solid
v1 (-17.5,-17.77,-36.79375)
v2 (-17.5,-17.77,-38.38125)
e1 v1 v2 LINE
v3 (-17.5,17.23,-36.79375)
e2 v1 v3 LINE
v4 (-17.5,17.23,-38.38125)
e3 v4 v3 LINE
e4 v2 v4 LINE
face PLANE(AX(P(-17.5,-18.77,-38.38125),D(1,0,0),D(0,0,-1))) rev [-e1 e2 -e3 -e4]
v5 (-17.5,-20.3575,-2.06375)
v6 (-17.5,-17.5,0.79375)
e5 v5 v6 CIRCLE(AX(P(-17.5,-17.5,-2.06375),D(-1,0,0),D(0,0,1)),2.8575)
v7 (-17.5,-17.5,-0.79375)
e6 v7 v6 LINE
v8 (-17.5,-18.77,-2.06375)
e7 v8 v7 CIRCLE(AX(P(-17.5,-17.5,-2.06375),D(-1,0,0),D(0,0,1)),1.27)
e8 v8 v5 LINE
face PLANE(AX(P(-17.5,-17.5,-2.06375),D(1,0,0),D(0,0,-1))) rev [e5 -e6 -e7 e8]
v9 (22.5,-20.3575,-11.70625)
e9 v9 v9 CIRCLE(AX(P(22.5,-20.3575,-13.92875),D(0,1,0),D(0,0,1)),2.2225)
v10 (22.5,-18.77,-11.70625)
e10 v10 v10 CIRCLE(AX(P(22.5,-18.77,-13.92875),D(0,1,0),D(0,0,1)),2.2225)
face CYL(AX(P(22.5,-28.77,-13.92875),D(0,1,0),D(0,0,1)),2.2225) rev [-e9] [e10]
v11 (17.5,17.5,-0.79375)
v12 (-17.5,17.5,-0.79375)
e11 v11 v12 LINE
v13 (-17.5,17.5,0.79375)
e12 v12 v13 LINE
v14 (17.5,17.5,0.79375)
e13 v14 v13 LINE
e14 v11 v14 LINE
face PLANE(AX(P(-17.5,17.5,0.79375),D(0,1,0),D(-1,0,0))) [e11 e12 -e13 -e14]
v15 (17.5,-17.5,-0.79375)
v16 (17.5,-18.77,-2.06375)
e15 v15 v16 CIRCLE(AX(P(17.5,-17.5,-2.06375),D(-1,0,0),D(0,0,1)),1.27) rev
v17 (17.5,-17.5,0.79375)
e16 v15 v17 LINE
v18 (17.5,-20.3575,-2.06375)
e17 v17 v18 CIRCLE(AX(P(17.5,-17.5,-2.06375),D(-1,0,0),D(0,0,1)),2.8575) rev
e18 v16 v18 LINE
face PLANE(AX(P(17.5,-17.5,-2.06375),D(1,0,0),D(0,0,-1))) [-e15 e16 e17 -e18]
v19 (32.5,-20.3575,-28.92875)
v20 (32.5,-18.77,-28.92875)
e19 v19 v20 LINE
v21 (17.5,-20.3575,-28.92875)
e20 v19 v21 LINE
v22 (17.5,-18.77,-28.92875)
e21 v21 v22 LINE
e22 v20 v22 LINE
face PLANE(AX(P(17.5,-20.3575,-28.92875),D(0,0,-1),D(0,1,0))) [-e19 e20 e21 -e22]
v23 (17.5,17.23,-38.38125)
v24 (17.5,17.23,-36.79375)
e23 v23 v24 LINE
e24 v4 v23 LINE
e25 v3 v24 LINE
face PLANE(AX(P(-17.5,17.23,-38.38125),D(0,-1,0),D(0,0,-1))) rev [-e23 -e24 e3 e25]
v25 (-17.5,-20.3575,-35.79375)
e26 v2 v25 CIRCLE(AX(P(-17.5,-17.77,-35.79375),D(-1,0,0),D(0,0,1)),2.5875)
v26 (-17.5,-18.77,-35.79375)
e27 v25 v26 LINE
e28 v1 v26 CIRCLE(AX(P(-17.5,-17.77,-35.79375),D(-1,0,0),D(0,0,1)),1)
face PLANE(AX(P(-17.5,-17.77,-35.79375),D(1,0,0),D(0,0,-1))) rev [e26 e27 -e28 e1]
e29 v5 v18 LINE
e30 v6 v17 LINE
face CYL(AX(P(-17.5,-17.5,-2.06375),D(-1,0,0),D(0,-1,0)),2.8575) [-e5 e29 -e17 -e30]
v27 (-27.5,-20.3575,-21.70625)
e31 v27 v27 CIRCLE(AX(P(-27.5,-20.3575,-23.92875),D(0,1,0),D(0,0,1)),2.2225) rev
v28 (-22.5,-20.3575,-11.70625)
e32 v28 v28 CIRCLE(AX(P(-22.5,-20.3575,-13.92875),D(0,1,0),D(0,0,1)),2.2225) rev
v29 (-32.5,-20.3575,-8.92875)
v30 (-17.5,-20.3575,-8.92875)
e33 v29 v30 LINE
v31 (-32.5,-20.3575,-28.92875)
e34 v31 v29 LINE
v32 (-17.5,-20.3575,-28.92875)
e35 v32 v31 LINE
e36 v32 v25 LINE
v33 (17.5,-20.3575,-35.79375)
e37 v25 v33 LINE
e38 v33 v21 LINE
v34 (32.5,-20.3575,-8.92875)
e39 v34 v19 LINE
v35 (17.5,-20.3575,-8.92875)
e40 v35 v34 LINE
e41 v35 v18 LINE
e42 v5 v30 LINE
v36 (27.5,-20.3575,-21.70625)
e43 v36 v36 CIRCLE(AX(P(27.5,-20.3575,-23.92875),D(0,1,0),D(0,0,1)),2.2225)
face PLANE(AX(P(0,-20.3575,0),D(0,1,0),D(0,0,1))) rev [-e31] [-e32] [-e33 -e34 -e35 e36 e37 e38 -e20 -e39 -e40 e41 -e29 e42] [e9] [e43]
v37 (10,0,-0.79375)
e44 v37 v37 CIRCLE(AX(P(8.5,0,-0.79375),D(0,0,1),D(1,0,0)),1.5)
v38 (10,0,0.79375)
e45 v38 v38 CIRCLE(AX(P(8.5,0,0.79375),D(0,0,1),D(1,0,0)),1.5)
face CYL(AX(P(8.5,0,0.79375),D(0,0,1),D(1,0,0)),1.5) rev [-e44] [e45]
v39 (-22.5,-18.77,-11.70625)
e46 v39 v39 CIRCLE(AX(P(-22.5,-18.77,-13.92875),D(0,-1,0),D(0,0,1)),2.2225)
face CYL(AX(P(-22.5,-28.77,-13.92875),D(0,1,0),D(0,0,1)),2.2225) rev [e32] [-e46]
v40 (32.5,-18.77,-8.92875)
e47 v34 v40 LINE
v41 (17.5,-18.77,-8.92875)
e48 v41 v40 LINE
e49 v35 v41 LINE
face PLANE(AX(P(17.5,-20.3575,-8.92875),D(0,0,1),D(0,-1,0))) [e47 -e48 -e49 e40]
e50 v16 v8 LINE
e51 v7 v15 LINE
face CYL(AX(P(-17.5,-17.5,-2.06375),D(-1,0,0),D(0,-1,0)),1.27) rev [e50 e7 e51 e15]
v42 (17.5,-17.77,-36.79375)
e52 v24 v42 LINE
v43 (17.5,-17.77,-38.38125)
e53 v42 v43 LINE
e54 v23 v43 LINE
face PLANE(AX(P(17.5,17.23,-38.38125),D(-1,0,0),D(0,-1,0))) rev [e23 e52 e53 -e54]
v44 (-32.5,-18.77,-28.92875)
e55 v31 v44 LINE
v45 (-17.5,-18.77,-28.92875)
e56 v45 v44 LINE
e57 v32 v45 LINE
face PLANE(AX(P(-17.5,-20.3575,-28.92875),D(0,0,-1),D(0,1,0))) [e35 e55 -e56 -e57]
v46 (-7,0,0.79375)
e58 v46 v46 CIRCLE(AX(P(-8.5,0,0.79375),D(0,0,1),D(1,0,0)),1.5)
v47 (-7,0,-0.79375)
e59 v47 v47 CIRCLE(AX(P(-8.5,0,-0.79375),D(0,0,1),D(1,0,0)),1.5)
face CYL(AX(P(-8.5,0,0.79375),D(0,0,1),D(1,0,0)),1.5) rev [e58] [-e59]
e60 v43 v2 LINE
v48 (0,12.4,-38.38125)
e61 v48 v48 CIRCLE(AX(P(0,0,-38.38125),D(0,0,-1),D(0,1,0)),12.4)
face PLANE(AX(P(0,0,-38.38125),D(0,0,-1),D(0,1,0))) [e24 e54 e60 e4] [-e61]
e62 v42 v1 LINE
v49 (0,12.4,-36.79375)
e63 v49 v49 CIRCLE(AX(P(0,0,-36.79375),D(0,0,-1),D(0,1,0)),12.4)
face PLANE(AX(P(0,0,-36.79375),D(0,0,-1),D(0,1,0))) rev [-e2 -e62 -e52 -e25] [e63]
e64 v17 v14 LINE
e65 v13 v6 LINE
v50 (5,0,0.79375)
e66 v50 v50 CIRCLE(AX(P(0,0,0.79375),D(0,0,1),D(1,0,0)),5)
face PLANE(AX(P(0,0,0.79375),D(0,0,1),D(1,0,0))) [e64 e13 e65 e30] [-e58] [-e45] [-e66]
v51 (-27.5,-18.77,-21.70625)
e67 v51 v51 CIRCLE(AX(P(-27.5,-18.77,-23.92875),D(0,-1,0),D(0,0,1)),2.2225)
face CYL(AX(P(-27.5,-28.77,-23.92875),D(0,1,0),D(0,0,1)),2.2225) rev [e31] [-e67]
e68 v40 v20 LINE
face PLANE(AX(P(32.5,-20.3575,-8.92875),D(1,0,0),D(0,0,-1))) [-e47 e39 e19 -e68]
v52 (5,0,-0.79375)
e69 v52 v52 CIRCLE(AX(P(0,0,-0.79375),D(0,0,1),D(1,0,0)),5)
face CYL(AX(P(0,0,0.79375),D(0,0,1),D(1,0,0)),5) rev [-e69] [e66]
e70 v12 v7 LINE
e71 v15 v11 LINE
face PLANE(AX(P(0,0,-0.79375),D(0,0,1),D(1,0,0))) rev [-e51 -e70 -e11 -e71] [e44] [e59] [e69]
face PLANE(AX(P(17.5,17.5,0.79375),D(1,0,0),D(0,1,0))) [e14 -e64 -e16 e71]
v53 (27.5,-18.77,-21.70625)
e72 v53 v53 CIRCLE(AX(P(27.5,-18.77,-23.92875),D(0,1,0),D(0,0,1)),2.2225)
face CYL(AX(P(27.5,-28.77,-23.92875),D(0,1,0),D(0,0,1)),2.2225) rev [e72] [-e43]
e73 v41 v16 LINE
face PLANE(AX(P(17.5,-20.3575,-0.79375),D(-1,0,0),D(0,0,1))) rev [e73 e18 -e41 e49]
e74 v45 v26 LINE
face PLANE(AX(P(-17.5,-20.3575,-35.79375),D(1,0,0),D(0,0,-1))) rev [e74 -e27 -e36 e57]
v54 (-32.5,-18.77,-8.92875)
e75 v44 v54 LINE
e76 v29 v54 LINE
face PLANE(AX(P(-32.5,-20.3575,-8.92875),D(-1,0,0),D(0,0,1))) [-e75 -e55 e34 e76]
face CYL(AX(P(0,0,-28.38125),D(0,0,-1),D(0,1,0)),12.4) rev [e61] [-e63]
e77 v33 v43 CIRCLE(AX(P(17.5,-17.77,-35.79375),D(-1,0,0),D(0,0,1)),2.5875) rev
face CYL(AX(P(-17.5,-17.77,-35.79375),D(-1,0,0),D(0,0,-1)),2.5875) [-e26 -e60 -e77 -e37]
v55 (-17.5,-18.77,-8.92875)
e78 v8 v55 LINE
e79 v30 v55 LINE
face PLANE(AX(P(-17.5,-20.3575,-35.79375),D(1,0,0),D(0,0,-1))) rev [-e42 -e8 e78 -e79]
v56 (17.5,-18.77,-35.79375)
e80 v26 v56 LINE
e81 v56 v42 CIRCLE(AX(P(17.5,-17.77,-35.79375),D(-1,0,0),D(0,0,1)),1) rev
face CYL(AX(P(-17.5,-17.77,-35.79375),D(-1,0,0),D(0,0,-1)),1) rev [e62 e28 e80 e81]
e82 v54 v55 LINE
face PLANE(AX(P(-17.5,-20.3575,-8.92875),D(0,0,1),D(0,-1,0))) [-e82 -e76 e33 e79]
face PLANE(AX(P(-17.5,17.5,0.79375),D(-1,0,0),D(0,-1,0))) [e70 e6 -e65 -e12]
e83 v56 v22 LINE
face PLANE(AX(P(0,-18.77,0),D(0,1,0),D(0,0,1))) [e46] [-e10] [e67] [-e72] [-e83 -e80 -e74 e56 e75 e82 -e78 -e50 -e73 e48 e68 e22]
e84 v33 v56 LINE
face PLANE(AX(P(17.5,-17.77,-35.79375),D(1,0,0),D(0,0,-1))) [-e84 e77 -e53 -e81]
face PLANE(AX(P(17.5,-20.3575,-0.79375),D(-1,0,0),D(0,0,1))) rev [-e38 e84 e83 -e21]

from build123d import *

# Parameters (mm, degrees)
SKETCH1_W                  = 35
SKETCH1_H                  = 35
SKETCH1_R                  = 1.5
SKETCH1_R_2                = 5
BOSS_EXTRUDE1_DEPTH        = 0.79375
CONVERT_SOLID2_START       = -0.79375
CONVERT_SOLID2_OUTLINE_W   = 35
CONVERT_SOLID2_OUTLINE_H   = 35
CONVERT_SOLID2_OUTLINE_R   = 1.5
CONVERT_SOLID2_OUTLINE_R_2 = 5
CONVERT_SOLID2_DEPTH       = 0.79375
EDGE_FLANGE1_DEPTH         = 35
EDGE_FLANGE2_DEPTH         = 35
SKETCH24_R                 = 12.4
CUT_EXTRUDE1_DEPTH         = 10
SKETCH29_W                 = 15
SKETCH29_H                 = 20
TAB1_DEPTH                 = 1.5875
SKETCH32_W                 = 15
SKETCH32_H                 = 20
TAB2_DEPTH                 = 1.5875
SKETCH35_R                 = 2.2225
CUT_EXTRUDE2_DEPTH         = 10


# Read off the part's stored shape, not the designer's step: Convert-Solid2
# Sheet-metal steps are written as plain solids
with BuildPart() as part:
    # Sketch1 → Boss-Extrude1 (new body)
    with BuildSketch(Plane.XY):
        Rectangle(SKETCH1_W, SKETCH1_H)
        with Locations((-8.5, 0)):
            Circle(SKETCH1_R, mode=Mode.SUBTRACT)
        with Locations((8.5, 0)):
            Circle(SKETCH1_R, mode=Mode.SUBTRACT)
        Circle(SKETCH1_R_2, mode=Mode.SUBTRACT)
    extrude(amount=BOSS_EXTRUDE1_DEPTH)

    # Convert-Solid2 outline → Convert-Solid2 (add)
    with BuildSketch(Plane.XY.offset(CONVERT_SOLID2_START)):
        Rectangle(CONVERT_SOLID2_OUTLINE_W, CONVERT_SOLID2_OUTLINE_H)
        with Locations((-8.5, 0)):
            Circle(CONVERT_SOLID2_OUTLINE_R, mode=Mode.SUBTRACT)
        Circle(CONVERT_SOLID2_OUTLINE_R_2, mode=Mode.SUBTRACT)
        with Locations((8.5, 0)):
            Circle(CONVERT_SOLID2_OUTLINE_R, mode=Mode.SUBTRACT)
    extrude(amount=CONVERT_SOLID2_DEPTH)

    # Edge-Flange1 section (across the edge) → Edge-Flange1 (add)
    with BuildSketch(Plane(origin=(17.5, -18.77, -0.79375), x_dir=(0, 1, 0), z_dir=(-1, 0, 0))):
        with BuildLine():
            Line((-1.5875, 1.27), (-1.5875, 35))
            Line((-1.5875, 35), (0, 35))
            Line((0, 35), (0, 1.27))
            ThreePointArc((0, 1.27), (0.371974388, 0.371974388), (1.27, 0))
            Line((1.27, 0), (1.27, -1.5875))
            ThreePointArc((1.27, -1.5875), (-0.750557627, -0.750557627), (-1.5875, 1.27))
        make_face()
    extrude(amount=EDGE_FLANGE1_DEPTH)

    # Edge-Flange2 section (across the edge) → Edge-Flange2 (add)
    with BuildSketch(Plane(origin=(17.5, -18.77, -36.79375), x_dir=(0, 0, 1), z_dir=(-1, 0, 0))):
        with BuildLine():
            Line((-1.5875, 1), (-1.5875, 36))
            Line((-1.5875, 36), (0, 36))
            Line((0, 36), (0, 1))
            ThreePointArc((0, 1), (0.292893219, 0.292893219), (1, 0))
            Line((1, 0), (1, -1.5875))
            ThreePointArc((1, -1.5875), (-0.829638796, -0.829638796), (-1.5875, 1))
        make_face()
    extrude(amount=EDGE_FLANGE2_DEPTH)

    # Sketch24 → Cut-Extrude1 (cut)
    with BuildSketch(Plane(origin=(0, 0, -38.38125), x_dir=(-1, 0, 0), z_dir=(0, 0, -1))):
        with Locations(Location((0, 0, 0), (0, 0, 90))):
            Circle(SKETCH24_R)
    extrude(amount=-CUT_EXTRUDE1_DEPTH, mode=Mode.SUBTRACT)

    # Sketch29 → Tab1 (add)
    with BuildSketch(Plane(origin=(0, -18.77, 0), x_dir=(1, 0, 0), z_dir=(0, 1, 0))):
        with Locations((25, 18.92875)):
            Rectangle(SKETCH29_W, SKETCH29_H)
    extrude(amount=-TAB1_DEPTH)

    # Sketch32 → Tab2 (add)
    with BuildSketch(Plane(origin=(0, -18.77, 0), x_dir=(1, 0, 0), z_dir=(0, 1, 0))):
        with Locations((-25, 18.92875)):
            Rectangle(SKETCH32_W, SKETCH32_H)
    extrude(amount=-TAB2_DEPTH)

    # Sketch35 → Cut-Extrude2 (cut)
    with BuildSketch(Plane(origin=(0, -18.77, 0), x_dir=(1, 0, 0), z_dir=(0, 1, 0))):
        with Locations(Location((22.5, 13.92875, 0), (0, 0, 270))):
            Circle(SKETCH35_R)
        with Locations(Location((27.5, 23.92875, 0), (0, 0, 270))):
            Circle(SKETCH35_R)
    cut_extrude2 = extrude(amount=-CUT_EXTRUDE2_DEPTH, mode=Mode.SUBTRACT)

    # Mirror1: Cut-Extrude2 across plane
    add(cut_extrude2.mirror(Plane(origin=(0, 0, 0), x_dir=(0, 0, 1), z_dir=(1, 0, 0))), mode=Mode.SUBTRACT)


solid = part.part
